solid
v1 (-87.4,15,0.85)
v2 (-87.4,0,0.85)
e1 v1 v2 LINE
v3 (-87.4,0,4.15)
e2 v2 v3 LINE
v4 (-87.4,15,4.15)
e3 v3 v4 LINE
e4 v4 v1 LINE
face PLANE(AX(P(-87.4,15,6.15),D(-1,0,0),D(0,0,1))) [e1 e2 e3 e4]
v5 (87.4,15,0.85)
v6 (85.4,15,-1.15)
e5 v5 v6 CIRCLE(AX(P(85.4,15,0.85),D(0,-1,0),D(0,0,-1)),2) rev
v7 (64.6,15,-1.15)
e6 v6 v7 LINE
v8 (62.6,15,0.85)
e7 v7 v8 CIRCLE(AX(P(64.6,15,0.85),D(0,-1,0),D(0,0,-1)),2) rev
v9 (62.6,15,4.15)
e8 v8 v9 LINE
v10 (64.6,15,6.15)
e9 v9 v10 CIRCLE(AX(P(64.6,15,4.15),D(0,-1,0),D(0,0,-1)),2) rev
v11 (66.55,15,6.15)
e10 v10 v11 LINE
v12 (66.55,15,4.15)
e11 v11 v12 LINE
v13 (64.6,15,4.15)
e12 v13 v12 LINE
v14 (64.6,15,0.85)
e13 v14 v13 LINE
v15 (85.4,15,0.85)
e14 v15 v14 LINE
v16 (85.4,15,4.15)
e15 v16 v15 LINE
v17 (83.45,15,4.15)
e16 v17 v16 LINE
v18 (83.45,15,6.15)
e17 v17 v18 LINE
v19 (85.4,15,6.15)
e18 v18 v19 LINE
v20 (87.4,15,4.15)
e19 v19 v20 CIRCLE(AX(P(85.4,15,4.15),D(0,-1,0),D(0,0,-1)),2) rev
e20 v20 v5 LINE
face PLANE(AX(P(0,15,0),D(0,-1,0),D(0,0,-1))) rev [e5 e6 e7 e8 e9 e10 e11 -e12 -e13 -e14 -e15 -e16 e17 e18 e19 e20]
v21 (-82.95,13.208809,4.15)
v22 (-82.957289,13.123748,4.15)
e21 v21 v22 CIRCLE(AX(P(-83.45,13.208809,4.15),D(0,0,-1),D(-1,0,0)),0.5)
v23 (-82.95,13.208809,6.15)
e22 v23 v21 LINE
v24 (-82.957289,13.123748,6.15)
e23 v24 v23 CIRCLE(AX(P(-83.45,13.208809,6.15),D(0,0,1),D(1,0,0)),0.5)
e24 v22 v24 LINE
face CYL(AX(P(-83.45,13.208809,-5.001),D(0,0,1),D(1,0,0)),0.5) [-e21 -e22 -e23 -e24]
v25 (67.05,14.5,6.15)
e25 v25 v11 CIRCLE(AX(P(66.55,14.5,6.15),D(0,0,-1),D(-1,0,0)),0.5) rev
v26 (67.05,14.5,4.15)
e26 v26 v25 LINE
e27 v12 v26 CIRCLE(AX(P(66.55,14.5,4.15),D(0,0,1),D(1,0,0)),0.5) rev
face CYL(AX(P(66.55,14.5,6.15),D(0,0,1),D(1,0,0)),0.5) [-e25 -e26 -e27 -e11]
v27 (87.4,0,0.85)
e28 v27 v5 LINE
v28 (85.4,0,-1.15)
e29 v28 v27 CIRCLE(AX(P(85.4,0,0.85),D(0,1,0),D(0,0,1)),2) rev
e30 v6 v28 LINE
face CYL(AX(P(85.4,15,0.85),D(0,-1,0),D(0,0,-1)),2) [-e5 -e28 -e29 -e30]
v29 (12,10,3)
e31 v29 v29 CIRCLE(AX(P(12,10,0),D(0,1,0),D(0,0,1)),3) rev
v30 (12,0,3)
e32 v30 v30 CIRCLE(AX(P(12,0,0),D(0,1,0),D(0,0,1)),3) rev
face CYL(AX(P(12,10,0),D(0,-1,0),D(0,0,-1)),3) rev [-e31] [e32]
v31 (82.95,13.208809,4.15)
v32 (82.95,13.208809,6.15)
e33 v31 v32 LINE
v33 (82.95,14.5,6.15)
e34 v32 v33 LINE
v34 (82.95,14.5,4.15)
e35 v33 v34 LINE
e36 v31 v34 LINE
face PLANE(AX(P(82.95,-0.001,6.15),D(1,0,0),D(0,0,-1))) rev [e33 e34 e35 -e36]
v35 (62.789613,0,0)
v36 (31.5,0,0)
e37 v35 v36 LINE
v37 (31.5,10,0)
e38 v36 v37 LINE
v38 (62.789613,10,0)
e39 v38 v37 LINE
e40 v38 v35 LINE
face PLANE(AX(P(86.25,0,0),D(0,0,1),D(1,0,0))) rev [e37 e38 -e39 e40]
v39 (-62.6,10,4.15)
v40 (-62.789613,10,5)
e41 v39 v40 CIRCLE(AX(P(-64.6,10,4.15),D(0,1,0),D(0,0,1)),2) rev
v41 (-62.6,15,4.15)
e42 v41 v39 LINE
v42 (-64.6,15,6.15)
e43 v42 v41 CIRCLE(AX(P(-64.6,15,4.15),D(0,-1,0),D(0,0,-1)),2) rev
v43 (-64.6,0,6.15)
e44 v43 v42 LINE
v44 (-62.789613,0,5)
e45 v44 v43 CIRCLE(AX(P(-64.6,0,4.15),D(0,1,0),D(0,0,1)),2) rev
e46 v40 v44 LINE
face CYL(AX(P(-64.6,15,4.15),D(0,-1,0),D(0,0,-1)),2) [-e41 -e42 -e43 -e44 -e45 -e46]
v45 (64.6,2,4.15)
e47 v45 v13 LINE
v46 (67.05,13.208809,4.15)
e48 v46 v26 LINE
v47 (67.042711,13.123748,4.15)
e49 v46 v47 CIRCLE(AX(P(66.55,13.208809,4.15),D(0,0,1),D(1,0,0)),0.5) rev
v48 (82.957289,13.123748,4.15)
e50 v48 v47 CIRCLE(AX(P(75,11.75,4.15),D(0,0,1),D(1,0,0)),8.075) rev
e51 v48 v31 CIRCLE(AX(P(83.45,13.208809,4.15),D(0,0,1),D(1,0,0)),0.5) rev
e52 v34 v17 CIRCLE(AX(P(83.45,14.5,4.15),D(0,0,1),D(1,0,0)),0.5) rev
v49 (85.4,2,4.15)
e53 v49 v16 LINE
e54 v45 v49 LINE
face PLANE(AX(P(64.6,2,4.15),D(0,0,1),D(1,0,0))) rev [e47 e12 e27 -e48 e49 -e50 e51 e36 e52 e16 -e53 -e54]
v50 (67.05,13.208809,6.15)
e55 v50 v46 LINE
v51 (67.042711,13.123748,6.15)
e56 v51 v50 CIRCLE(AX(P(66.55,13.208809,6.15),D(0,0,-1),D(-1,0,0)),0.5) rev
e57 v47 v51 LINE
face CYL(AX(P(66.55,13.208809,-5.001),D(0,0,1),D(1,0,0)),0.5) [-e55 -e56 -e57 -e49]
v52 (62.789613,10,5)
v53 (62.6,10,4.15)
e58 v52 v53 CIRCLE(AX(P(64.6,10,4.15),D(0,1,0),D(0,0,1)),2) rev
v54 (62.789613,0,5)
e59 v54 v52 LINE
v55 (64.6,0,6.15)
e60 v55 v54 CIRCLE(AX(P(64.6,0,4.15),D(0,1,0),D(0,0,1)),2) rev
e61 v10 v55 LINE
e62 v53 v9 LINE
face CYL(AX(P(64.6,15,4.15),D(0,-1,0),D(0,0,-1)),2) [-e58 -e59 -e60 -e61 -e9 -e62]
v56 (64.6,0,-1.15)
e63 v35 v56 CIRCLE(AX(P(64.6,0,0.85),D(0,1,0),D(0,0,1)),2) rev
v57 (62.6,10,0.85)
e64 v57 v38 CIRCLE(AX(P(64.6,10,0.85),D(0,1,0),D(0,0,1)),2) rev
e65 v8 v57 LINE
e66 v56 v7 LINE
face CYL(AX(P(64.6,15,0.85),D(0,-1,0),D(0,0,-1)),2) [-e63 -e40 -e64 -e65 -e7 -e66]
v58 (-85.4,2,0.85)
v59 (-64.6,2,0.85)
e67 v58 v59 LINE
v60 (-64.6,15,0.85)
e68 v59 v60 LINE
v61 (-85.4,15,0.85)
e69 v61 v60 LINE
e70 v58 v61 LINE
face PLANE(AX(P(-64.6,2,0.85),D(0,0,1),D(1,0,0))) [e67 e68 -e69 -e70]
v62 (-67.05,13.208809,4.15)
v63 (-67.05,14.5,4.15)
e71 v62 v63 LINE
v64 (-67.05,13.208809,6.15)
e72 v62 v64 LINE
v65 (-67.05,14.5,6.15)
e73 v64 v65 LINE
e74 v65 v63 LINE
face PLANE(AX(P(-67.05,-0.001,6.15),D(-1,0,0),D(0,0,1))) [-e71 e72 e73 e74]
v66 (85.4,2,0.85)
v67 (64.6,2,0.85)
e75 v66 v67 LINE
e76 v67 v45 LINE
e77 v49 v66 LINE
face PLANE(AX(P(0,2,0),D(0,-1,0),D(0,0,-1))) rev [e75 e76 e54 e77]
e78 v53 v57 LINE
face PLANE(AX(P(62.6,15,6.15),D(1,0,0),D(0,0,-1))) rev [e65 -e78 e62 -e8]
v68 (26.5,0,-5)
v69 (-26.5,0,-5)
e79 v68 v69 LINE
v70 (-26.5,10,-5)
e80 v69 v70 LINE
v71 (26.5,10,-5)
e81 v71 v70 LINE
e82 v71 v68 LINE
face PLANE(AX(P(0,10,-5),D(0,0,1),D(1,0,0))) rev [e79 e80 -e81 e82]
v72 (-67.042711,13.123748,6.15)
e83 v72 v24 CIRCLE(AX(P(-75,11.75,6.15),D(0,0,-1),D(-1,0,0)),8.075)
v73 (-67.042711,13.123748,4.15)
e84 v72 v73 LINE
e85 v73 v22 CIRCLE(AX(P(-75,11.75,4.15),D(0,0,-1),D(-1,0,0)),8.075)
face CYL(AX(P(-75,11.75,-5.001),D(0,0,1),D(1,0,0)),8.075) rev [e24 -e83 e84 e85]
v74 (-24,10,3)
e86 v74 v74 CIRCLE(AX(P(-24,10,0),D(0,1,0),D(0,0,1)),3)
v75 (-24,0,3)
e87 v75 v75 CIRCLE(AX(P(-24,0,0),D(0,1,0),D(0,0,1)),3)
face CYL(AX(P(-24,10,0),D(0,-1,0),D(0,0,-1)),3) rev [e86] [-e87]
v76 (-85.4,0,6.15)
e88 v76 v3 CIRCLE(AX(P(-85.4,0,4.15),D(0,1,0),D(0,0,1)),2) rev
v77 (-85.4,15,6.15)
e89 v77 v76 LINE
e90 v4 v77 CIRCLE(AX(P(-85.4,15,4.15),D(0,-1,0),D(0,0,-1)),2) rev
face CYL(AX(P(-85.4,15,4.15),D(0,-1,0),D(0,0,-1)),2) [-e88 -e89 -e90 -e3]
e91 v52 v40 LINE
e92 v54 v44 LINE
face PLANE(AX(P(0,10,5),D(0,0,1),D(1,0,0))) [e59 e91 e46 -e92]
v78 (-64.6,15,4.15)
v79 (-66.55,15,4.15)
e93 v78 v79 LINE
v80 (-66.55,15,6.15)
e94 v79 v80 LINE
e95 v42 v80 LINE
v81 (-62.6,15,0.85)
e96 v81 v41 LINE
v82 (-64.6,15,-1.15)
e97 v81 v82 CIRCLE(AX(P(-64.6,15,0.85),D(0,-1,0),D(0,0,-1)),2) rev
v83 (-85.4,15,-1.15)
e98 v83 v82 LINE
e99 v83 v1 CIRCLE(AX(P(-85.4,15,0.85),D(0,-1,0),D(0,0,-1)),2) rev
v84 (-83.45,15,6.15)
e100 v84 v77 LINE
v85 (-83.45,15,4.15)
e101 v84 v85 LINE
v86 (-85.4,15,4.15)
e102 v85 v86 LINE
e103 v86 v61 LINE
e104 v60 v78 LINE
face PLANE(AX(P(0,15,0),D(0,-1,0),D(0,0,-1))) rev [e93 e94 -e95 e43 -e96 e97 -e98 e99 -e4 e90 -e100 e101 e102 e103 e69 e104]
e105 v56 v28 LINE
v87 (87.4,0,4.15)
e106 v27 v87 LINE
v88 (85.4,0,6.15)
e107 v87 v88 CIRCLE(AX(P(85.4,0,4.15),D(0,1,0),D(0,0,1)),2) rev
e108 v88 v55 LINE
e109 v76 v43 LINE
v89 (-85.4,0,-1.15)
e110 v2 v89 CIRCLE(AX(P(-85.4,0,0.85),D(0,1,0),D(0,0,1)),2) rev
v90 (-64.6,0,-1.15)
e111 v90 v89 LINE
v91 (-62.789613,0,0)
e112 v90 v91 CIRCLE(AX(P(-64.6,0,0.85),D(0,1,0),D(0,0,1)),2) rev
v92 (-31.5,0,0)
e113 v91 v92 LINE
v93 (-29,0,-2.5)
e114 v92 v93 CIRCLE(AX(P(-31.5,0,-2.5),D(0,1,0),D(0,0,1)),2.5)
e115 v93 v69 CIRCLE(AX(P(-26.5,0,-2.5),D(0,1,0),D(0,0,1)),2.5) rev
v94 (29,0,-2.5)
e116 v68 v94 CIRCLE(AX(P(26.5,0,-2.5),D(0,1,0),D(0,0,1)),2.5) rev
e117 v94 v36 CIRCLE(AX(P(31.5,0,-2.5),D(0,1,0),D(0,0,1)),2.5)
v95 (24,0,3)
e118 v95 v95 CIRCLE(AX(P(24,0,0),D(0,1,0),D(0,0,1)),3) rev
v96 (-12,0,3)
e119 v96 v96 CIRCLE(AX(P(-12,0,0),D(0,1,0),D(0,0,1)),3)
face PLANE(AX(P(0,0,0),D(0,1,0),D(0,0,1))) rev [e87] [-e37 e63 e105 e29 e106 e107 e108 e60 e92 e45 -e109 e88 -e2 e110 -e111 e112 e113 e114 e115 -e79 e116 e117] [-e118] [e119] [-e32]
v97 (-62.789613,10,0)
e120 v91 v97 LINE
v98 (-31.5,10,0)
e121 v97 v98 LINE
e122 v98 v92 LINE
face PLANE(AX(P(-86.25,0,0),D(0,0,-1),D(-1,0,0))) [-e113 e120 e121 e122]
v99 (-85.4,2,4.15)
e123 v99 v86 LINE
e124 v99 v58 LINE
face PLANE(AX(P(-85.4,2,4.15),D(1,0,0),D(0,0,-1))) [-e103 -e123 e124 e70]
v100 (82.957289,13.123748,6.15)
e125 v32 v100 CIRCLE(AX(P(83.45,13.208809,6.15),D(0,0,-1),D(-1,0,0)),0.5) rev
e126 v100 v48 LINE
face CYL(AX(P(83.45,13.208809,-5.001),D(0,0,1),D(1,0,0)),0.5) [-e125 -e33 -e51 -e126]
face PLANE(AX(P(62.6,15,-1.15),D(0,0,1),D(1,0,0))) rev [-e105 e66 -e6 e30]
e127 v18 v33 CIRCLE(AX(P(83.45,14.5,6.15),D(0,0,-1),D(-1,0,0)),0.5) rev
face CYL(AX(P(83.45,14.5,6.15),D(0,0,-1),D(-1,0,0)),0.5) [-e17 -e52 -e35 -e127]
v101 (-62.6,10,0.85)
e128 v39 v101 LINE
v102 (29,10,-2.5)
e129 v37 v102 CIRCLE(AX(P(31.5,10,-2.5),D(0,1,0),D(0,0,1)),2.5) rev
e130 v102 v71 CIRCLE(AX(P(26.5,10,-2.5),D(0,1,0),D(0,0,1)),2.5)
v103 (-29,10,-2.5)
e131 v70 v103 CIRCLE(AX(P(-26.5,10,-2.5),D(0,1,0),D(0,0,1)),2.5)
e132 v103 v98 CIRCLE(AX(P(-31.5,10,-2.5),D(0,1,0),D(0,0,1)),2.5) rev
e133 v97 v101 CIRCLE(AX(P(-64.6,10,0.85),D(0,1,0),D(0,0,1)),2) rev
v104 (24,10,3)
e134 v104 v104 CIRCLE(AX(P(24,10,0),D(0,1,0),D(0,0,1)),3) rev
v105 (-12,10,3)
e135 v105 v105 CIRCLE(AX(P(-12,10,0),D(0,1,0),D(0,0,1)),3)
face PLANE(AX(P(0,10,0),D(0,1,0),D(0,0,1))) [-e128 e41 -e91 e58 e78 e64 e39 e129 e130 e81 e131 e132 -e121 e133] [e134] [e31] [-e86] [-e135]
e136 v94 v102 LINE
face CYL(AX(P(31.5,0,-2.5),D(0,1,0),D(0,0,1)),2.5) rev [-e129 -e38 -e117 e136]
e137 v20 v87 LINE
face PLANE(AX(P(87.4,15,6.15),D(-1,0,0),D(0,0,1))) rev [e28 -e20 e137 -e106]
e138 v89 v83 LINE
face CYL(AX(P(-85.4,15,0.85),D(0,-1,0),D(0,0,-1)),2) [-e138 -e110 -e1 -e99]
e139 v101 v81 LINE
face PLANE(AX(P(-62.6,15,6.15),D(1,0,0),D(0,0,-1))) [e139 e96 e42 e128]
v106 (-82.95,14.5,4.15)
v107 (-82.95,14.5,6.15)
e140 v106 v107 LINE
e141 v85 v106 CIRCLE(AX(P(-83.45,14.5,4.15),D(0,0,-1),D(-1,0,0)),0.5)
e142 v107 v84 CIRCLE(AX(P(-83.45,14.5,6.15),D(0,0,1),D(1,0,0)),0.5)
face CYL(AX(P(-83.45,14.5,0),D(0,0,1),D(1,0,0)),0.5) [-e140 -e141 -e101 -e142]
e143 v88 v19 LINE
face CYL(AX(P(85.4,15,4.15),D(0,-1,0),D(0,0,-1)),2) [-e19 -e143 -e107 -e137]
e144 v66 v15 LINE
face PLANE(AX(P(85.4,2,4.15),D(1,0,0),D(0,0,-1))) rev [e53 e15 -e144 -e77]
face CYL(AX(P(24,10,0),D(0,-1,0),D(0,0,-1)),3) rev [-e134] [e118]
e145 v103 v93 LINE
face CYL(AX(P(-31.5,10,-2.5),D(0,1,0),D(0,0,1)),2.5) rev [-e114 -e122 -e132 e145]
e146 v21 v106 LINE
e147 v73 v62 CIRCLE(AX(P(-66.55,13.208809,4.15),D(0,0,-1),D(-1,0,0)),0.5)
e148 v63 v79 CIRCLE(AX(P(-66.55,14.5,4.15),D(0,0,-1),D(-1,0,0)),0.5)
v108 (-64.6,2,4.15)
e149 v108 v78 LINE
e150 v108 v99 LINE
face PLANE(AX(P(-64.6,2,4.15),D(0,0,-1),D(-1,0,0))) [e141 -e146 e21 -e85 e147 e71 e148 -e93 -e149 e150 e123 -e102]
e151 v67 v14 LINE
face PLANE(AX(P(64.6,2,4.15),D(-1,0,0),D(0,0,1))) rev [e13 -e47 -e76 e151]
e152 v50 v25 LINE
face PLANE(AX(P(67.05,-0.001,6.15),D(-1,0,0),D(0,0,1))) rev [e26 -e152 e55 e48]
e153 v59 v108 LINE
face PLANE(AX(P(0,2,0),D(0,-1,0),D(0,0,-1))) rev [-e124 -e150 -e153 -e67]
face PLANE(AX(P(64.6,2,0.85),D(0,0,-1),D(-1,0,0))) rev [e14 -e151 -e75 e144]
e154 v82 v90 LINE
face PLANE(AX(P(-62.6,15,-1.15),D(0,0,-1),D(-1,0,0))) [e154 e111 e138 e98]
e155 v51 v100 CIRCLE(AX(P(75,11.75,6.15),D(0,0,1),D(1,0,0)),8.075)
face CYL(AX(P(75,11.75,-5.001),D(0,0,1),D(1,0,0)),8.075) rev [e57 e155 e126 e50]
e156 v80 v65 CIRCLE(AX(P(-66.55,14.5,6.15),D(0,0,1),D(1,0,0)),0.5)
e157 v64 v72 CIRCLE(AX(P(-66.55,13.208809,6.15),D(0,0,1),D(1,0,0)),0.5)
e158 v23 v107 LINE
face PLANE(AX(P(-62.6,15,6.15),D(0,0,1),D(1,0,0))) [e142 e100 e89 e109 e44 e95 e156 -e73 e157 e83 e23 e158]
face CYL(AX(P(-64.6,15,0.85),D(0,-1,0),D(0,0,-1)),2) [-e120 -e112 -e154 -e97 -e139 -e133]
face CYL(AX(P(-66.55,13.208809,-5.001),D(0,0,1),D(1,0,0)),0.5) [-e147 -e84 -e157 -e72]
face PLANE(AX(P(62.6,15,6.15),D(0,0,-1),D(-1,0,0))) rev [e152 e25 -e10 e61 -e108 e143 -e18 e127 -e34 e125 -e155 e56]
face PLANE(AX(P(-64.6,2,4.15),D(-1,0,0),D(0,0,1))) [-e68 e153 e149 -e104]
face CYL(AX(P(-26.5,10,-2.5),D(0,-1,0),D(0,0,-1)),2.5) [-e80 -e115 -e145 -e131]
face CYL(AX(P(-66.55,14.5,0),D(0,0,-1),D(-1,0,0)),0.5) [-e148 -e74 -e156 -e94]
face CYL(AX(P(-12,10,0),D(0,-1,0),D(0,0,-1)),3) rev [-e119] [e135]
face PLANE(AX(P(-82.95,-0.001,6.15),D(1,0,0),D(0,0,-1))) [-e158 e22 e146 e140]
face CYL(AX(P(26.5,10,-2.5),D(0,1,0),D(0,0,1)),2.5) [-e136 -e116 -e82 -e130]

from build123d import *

# Parameters (mm, degrees)
SKIZZE1_W                                   = 29
SKIZZE1_H                                   = 10
SKIZZE1_R                                   = 3
AUFSATZ_LINEAR_AUSTRAGEN1_DEPTH             = 10
SKIZZE2_W                                   = 5
SKIZZE2_H                                   = 10
AUFSATZ_LINEAR_AUSTRAGEN2_DEPTH             = 57.25
SKIZZE3_W                                   = 20.8
SKIZZE3_H                                   = 3.3
SCHNITT_LINEAR_AUSTRAGEN1_DEPTH             = 8
AUFSATZ_LINEAR_AUSTRAGEN3_REACH             = 88.972
SKIZZE5_W                                   = 24.8
SKIZZE5_H                                   = 7.3
SKIZZE5_W_2                                 = 20.8
SKIZZE5_H_2                                 = 3.3
AUFSATZ_LINEAR_AUSTRAGEN3_DIRECTION_2_DEPTH = 5
SCHNITT_LINEAR_AUSTRAGEN2_REACH             = 91.376
SKIZZE4_R                                   = 8.075
SCHNITT_LINEAR_START                        = -1.834682
SKIZZE7_W                                   = 15.9
SKIZZE7_H                                   = 2
SCHNITT_LINEAR_AUSTRAGEN3_DEPTH             = 1.834682
VERRUNDUNG1_R                               = 2
VERRUNDUNG3_R                               = 0.5
VERRUNDUNG1_OF_SPIEGELN1_R                  = 2
VERRUNDUNG3_OF_SPIEGELN1_R                  = 0.5
VERRUNDUNG2_START                           = -1
VERRUNDUNG2_DEPTH                           = 12
VERRUNDUNG2_2_DEPTH                         = 10


with BuildPart() as part:
    # Skizze1 → Aufsatz-Linear austragen1 (new body)
    # profile 1 of 2: a face of its own
    with BuildSketch(Plane(origin=(0, 0, 0), x_dir=(1, 0, 0), z_dir=(0, 1, 0))):
        with Locations((-14.5, 0)):
            Rectangle(SKIZZE1_W, SKIZZE1_H)
        with Locations(Location((-24, 0, 0), (0, 0, 270))):
            Circle(SKIZZE1_R, mode=Mode.SUBTRACT)
        with Locations(Location((-12, 0, 0), (0, 0, 270))):
            Circle(SKIZZE1_R, mode=Mode.SUBTRACT)
    # profile 2 of 2: a face of its own
    with BuildSketch(Plane(origin=(0, 0, 0), x_dir=(1, 0, 0), z_dir=(0, 1, 0))):
        with Locations((14.5, 0)):
            Rectangle(SKIZZE1_W, SKIZZE1_H)
        with Locations(Location((12, 0, 0), (0, 0, 270))):
            Circle(SKIZZE1_R, mode=Mode.SUBTRACT)
        with Locations(Location((24, 0, 0), (0, 0, 270))):
            Circle(SKIZZE1_R, mode=Mode.SUBTRACT)
    extrude(amount=AUFSATZ_LINEAR_AUSTRAGEN1_DEPTH)

    # Skizze2 → Aufsatz-Linear austragen2 (add)
    with BuildSketch(Plane(origin=(29, 0, 0), x_dir=(0, 0, -1), z_dir=(1, 0, 0))):
        with Locations((-2.5, 5)):
            Rectangle(SKIZZE2_W, SKIZZE2_H)
    aufsatz_linear_austragen2 = extrude(amount=AUFSATZ_LINEAR_AUSTRAGEN2_DEPTH)

    # Skizze3 → Schnitt-Linear austragen1 (cut)
    with BuildSketch(Plane(origin=(0, 10, 0), x_dir=(1, 0, 0), z_dir=(0, 1, 0))):
        with Locations((75, -2.5)):
            Rectangle(SKIZZE3_W, SKIZZE3_H)
    schnitt_linear_austragen1 = extrude(amount=-SCHNITT_LINEAR_AUSTRAGEN1_DEPTH, mode=Mode.SUBTRACT)

    # Aufsatz-Linear austragen3: up to this face of the body (flat: up to its plane)
    aufsatz_linear_austragen3_end = Plane(part.part.faces().sort_by_distance((28.625, 0, 3.84316974))[0])
    # Skizze5 → Aufsatz-Linear austragen3 (add, up to the picked face)
    with BuildSketch(Plane(origin=(0, 10, 0), x_dir=(1, 0, 0), z_dir=(0, 1, 0)), mode=Mode.PRIVATE) as aufsatz_linear_austragen3_sk1:
        with Locations((75, -2.5)):
            Rectangle(SKIZZE5_W, SKIZZE5_H)
        with Locations((75, -2.5)):
            Rectangle(SKIZZE5_W_2, SKIZZE5_H_2, mode=Mode.SUBTRACT)
    aufsatz_linear_austragen3_tool1 = split(extrude(aufsatz_linear_austragen3_sk1.sketch, amount=-AUFSATZ_LINEAR_AUSTRAGEN3_REACH, mode=Mode.PRIVATE), bisect_by=aufsatz_linear_austragen3_end, keep=Keep.BOTH, mode=Mode.PRIVATE)
    aufsatz_linear_austragen3 = aufsatz_linear_austragen3_tool1.solids().sort_by(Axis((75, 10, 5.891479), (0, -1, 0)))[0]
    add(aufsatz_linear_austragen3)

    # Skizze5 → Aufsatz-Linear austragen3 direction 2 (add)
    with BuildSketch(Plane(origin=(0, 10, 0), x_dir=(1, 0, 0), z_dir=(0, 1, 0))):
        with Locations((75, -2.5)):
            Rectangle(SKIZZE5_W, SKIZZE5_H)
        with Locations((75, -2.5)):
            Rectangle(SKIZZE5_W_2, SKIZZE5_H_2, mode=Mode.SUBTRACT)
    aufsatz_linear_austragen3_direction_2 = extrude(amount=AUFSATZ_LINEAR_AUSTRAGEN3_DIRECTION_2_DEPTH)

    # Skizze4 → Schnitt-Linear austragen2 (cut, up to next)
    with BuildSketch(Plane.XY.offset(6.15), mode=Mode.PRIVATE) as schnitt_linear_austragen2_sk1:
        with Locations((75, 11.75)):
            Circle(SKIZZE4_R)
    schnitt_linear_austragen2_tool1 = extrude(schnitt_linear_austragen2_sk1.sketch, amount=-SCHNITT_LINEAR_AUSTRAGEN2_REACH, mode=Mode.PRIVATE) & part.part
    schnitt_linear_austragen2 = schnitt_linear_austragen2_tool1.solids().sort_by_distance((75, 11.75, 6.15))[0]
    add(schnitt_linear_austragen2, mode=Mode.SUBTRACT)

    # Skizze7 → Schnitt-Linear austragen3 (cut)
    with BuildSketch(Plane(origin=(0, 15, 0), x_dir=(1, 0, 0), z_dir=(0, 1, 0)).offset(SCHNITT_LINEAR_START)):
        with Locations((75, -5.15)):
            Rectangle(SKIZZE7_W, SKIZZE7_H)
    schnitt_linear_austragen3 = extrude(amount=SCHNITT_LINEAR_AUSTRAGEN3_DEPTH, mode=Mode.SUBTRACT)

    # Verrundung1
    verrundung1_edges = [part.edges().sort_by_distance(p)[0] for p in [
        (87.4, 7.5, 6.15),
        (87.4, 7.5, -1.15),
        (62.6, 7.5, 6.15),
        (62.6, 7.5, -1.15),
    ]]
    fillet(verrundung1_edges, radius=VERRUNDUNG1_R)

    # Verrundung3
    verrundung3_edges = [part.edges().sort_by_distance(p)[0] for p in [
        (82.95, 15, 5.15),
        (82.95, 13.165318, 5.15),
        (67.05, 15, 5.15),
        (67.05, 13.165318, 5.15),
    ]]
    fillet(verrundung3_edges, radius=VERRUNDUNG3_R)

    # Spiegeln1: Aufsatz-Linear austragen2, Schnitt-Linear austragen1, Aufsatz-Linear austragen3, Aufsatz-Linear austragen3 direction 2, Schnitt-Linear austragen2, Schnitt-Linear austragen3 across plane
    add(aufsatz_linear_austragen2.mirror(Plane(origin=(0, 0, 0), x_dir=(0, 0, 1), z_dir=(1, 0, 0))))
    add(schnitt_linear_austragen1.mirror(Plane(origin=(0, 0, 0), x_dir=(0, 0, 1), z_dir=(1, 0, 0))), mode=Mode.SUBTRACT)
    add(aufsatz_linear_austragen3.mirror(Plane(origin=(0, 0, 0), x_dir=(0, 0, 1), z_dir=(1, 0, 0))))
    add(aufsatz_linear_austragen3_direction_2.mirror(Plane(origin=(0, 0, 0), x_dir=(0, 0, 1), z_dir=(1, 0, 0))))
    add(schnitt_linear_austragen2.mirror(Plane(origin=(0, 0, 0), x_dir=(0, 0, 1), z_dir=(1, 0, 0))), mode=Mode.SUBTRACT)
    add(schnitt_linear_austragen3.mirror(Plane(origin=(0, 0, 0), x_dir=(0, 0, 1), z_dir=(1, 0, 0))), mode=Mode.SUBTRACT)

    # Verrundung1 of Spiegeln1
    verrundung1_of_spiegeln1_edges = [part.edges().sort_by_distance(p)[0] for p in [
        (-87.4, 7.5, 6.15),
        (-87.4, 7.5, -1.15),
        (-62.6, 7.5, 6.15),
        (-62.6, 7.5, -1.15),
    ]]
    fillet(verrundung1_of_spiegeln1_edges, radius=VERRUNDUNG1_OF_SPIEGELN1_R)

    # Verrundung3 of Spiegeln1
    verrundung3_of_spiegeln1_edges = [part.edges().sort_by_distance(p)[0] for p in [
        (-82.95, 15, 5.15),
        (-82.95, 13.165318, 5.15),
        (-67.05, 15, 5.15),
        (-67.05, 13.165318, 5.15),
    ]]
    fillet(verrundung3_of_spiegeln1_edges, radius=VERRUNDUNG3_OF_SPIEGELN1_R)

    # Verrundung2: read off the stored shape, not the designer's step
    # Verrundung2 outline → Verrundung2 (cut)
    with BuildSketch(Plane(origin=(0, 0, 0), x_dir=(1, 0, 0), z_dir=(0, 1, 0)).offset(VERRUNDUNG2_START)):
        with BuildLine():
            ThreePointArc((-29, 2.5), (-28.267766953, 4.267766953), (-26.5, 5))
            Line((-26.5, 5), (-29, 5))
            Line((-29, 5), (-29, 2.5))
        make_face()
        with BuildLine():
            ThreePointArc((26.5, 5), (28.267766953, 4.267766953), (29, 2.5))
            Line((29, 2.5), (29, 5))
            Line((29, 5), (26.5, 5))
        make_face()
    extrude(amount=VERRUNDUNG2_DEPTH, mode=Mode.SUBTRACT)

    # Verrundung2 2 outline → Verrundung2 2 (add)
    with BuildSketch(Plane(origin=(0, 0, 0), x_dir=(1, 0, 0), z_dir=(0, 1, 0))):
        with BuildLine():
            Line((-29, 0), (-29, 2.5))
            ThreePointArc((-29, 2.5), (-29.732233047, 0.732233047), (-31.5, 0))
            Line((-31.5, 0), (-29, 0))
        make_face()
        with BuildLine():
            ThreePointArc((31.5, 0), (29.732233047, 0.732233047), (29, 2.5))
            Line((29, 2.5), (29, 0))
            Line((29, 0), (31.5, 0))
        make_face()
    extrude(amount=VERRUNDUNG2_2_DEPTH)


solid = part.part
